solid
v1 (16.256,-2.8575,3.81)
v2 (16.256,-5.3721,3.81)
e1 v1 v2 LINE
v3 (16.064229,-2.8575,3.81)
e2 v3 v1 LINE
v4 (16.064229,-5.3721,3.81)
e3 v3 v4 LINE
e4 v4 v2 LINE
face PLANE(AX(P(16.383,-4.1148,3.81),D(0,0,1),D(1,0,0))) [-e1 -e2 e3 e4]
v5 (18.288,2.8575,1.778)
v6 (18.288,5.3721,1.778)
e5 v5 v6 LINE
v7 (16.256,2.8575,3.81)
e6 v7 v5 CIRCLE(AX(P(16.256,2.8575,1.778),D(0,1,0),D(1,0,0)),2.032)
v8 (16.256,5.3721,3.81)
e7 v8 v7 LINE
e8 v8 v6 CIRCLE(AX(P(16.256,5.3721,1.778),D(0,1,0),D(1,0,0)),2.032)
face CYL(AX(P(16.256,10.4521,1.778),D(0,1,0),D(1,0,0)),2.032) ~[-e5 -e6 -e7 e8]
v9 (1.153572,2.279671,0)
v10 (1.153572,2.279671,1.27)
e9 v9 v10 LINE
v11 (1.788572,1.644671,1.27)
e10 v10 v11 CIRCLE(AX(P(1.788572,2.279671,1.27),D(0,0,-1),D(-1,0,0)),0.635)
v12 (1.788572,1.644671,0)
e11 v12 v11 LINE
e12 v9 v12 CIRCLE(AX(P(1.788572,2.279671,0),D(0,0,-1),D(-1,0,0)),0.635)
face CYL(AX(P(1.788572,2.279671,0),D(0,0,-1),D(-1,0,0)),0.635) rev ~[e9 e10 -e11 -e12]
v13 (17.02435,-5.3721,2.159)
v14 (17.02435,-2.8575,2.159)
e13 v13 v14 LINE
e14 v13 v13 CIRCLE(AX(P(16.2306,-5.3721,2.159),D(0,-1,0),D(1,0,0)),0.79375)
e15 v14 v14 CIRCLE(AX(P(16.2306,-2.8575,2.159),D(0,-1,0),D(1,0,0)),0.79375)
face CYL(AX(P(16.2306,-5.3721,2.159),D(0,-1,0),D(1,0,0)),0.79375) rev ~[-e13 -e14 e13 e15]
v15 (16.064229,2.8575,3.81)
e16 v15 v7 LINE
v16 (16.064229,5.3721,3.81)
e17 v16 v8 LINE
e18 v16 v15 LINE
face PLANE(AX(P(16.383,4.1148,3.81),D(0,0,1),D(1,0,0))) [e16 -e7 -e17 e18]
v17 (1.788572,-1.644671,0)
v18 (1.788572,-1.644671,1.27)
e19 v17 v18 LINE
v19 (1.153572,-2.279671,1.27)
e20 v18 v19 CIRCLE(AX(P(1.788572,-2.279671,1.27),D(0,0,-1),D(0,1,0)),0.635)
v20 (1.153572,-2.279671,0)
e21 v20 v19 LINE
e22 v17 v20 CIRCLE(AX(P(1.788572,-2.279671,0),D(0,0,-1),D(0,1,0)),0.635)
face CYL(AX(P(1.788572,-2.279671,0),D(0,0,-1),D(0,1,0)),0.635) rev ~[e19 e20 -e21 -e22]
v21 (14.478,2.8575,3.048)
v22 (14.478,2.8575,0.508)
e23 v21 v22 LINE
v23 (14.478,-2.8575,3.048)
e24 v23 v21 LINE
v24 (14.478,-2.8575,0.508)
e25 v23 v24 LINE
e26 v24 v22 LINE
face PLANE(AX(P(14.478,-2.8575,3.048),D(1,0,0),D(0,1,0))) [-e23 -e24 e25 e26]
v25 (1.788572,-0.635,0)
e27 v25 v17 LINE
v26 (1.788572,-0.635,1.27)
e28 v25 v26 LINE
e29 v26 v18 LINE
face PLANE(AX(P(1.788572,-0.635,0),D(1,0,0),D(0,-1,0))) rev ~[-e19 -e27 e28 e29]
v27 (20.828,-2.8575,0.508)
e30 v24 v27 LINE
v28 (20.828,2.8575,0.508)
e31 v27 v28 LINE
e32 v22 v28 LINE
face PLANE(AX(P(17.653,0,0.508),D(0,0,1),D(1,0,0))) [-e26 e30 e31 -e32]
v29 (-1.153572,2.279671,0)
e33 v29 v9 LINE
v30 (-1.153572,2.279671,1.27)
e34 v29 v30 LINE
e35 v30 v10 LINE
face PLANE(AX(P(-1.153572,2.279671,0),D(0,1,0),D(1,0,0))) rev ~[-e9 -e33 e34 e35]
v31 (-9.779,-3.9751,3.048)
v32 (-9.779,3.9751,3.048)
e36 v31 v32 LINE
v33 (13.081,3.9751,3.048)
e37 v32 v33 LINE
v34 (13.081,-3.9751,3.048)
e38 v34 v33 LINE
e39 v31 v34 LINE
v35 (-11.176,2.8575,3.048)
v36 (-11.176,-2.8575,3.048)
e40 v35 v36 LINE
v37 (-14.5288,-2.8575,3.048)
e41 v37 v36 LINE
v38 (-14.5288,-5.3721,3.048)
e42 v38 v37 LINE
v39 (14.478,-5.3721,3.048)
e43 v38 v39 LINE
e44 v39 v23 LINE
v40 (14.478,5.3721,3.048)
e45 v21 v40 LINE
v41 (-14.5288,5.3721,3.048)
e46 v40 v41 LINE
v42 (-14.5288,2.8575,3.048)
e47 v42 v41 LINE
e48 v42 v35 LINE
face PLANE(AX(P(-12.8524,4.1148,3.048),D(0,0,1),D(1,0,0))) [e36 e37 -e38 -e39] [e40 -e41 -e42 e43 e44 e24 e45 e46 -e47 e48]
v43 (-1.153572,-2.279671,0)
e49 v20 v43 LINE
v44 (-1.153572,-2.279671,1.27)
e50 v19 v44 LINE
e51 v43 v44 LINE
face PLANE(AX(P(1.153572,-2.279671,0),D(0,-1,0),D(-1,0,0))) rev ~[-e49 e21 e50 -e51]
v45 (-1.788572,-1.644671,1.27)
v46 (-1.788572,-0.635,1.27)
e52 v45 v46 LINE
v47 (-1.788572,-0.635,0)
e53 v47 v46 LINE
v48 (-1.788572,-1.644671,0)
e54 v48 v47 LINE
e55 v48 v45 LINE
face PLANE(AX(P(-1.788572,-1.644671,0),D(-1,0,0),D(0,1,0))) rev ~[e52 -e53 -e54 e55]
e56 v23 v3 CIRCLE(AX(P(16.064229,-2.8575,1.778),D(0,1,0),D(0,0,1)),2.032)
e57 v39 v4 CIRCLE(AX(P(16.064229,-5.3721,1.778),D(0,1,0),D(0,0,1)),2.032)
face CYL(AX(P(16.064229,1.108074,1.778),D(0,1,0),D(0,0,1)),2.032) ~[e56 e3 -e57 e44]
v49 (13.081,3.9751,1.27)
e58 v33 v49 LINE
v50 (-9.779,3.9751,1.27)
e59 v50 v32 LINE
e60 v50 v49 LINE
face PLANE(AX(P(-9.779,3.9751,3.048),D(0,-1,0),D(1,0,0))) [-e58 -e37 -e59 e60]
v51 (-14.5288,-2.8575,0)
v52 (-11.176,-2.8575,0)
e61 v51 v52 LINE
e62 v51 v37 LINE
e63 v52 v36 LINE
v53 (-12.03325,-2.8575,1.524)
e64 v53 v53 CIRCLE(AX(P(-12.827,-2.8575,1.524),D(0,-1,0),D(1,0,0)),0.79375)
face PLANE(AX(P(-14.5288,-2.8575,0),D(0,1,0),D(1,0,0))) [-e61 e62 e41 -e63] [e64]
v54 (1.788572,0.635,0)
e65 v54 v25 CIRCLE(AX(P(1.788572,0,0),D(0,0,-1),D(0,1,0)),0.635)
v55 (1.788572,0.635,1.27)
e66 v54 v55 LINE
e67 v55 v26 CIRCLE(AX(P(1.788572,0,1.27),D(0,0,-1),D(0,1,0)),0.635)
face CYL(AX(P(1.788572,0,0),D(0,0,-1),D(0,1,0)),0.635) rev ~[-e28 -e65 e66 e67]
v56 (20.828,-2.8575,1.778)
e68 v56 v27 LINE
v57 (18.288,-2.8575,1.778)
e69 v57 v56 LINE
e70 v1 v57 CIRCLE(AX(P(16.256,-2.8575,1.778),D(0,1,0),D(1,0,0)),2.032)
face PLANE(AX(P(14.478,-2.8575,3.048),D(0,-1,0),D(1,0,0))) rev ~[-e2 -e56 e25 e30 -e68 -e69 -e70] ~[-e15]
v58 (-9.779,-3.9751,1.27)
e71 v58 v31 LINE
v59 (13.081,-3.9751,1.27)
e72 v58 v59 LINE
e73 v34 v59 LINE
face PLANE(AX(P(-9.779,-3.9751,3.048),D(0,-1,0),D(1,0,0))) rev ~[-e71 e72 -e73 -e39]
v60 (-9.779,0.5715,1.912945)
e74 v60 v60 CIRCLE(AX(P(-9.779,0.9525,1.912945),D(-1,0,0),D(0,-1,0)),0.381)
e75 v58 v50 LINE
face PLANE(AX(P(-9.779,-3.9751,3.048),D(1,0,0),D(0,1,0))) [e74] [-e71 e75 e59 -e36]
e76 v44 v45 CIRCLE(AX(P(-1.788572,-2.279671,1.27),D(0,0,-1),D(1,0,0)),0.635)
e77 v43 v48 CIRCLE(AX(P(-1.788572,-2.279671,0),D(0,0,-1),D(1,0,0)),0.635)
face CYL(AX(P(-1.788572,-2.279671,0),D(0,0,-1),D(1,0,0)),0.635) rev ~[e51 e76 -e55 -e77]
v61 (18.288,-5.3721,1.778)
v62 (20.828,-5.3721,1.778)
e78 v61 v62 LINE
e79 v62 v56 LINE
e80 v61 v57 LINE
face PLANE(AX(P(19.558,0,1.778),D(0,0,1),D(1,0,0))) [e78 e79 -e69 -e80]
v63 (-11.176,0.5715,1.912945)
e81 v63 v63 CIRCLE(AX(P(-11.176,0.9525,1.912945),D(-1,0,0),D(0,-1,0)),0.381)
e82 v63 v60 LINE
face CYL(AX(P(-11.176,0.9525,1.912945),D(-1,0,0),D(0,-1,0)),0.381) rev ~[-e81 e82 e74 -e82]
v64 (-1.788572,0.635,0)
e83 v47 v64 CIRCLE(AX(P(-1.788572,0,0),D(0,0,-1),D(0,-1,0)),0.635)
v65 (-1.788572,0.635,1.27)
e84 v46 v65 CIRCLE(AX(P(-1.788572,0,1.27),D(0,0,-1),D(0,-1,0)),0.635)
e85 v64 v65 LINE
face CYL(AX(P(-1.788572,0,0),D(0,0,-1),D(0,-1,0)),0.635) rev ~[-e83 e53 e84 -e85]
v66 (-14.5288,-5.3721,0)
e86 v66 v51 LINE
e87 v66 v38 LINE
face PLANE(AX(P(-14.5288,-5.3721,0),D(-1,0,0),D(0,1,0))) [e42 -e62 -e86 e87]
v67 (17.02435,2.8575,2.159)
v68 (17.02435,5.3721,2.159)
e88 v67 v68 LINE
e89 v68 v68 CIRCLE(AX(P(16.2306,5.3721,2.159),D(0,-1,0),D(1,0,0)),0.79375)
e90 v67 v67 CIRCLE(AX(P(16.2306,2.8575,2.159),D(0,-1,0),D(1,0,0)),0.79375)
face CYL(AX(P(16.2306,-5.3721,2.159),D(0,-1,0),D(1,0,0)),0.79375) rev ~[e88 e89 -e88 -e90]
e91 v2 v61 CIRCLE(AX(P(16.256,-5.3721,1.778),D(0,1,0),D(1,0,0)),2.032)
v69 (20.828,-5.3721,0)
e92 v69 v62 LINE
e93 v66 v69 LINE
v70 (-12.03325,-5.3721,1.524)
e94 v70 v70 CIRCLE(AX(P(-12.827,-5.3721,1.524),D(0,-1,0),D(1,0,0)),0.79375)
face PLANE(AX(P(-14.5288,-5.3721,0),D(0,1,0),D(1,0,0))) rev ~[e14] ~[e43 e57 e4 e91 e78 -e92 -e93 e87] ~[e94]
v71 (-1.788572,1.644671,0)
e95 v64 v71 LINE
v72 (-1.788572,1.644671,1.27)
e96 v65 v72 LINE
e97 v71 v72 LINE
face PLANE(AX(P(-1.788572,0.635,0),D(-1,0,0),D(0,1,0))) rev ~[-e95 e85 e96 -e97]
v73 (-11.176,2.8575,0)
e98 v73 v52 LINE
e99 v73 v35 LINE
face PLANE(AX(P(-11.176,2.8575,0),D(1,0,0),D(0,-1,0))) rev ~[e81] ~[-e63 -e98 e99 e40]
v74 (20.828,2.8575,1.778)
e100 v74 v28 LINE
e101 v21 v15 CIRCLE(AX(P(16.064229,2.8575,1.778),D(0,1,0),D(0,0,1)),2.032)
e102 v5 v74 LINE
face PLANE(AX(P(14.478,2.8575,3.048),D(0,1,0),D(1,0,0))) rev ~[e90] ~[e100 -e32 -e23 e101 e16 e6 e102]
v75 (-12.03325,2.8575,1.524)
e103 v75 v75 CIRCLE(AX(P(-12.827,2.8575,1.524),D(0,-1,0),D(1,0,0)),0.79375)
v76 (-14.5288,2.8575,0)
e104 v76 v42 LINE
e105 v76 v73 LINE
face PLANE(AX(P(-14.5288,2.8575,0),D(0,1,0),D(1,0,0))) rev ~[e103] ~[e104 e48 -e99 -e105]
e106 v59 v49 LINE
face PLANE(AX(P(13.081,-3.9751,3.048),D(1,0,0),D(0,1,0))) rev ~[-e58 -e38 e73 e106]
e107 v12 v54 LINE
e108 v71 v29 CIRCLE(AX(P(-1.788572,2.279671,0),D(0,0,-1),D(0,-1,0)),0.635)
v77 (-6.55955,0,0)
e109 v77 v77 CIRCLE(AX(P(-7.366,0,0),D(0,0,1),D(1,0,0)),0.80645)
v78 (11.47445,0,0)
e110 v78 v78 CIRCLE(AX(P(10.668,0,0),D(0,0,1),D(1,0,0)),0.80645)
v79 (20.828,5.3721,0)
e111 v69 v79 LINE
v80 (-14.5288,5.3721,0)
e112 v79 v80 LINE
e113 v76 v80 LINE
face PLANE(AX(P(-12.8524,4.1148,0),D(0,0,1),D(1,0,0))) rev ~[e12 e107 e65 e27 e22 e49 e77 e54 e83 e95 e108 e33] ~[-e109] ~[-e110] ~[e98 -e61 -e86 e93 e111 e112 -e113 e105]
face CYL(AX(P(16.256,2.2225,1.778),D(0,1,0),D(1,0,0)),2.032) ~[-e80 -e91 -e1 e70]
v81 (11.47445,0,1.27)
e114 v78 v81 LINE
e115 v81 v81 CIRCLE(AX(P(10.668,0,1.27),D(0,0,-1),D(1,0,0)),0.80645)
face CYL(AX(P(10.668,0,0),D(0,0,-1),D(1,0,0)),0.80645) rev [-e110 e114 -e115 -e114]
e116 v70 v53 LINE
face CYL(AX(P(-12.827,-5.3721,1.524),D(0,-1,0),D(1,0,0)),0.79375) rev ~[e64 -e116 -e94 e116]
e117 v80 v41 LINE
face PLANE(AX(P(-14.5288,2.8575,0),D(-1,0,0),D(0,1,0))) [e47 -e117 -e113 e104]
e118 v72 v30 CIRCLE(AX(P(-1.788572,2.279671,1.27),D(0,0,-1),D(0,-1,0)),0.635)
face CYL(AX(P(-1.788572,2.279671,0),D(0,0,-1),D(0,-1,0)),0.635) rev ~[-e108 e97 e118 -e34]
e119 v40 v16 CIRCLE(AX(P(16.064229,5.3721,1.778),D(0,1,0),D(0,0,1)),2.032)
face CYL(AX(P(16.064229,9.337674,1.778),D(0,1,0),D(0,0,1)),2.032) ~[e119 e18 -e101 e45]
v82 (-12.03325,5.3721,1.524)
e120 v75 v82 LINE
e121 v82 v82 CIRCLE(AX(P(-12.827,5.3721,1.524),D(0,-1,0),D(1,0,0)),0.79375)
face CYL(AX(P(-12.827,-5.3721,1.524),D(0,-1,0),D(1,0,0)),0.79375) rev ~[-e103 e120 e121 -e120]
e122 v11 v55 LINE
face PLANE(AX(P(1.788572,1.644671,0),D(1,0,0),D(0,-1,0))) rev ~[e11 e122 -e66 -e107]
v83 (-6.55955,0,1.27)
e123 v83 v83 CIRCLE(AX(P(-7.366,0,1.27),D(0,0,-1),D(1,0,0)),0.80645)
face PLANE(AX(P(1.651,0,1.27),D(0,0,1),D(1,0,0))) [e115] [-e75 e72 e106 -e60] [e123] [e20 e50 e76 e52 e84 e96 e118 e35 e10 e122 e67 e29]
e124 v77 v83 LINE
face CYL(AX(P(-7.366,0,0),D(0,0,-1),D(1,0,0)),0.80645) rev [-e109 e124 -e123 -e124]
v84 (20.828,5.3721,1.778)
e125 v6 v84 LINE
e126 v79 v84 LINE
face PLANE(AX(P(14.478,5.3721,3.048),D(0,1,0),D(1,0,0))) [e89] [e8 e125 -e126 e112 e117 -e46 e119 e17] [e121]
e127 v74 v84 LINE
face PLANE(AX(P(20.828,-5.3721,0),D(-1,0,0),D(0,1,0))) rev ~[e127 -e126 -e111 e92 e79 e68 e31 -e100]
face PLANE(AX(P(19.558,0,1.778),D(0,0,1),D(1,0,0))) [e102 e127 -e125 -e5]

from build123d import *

# Parameters (mm, degrees)
F0_W         = 3.3528
F0_H         = 2.5146
F0_R         = 0.80645
F0_W_2       = 6.35
F0_H_2       = 10.7442
F1_DEPTH     = 3.048
F2_W         = 2.54
F2_H         = 10.7442
F2_W_2       = 22.86
F2_H_2       = 7.9502
F3_DEPTH     = 1.27
F4_W         = 6.35
F4_H         = 5.715
F5_DEPTH     = 2.54
F6_R         = 0.79375
F7_DEPTH     = 10.7452
F8_DEPTH     = 0.508
F9_W         = 3.81
F9_H         = 2.5146
F10_DEPTH    = 0.762
F11_T1_DEPTH = 10.445747458
F11_T3_DEPTH = 10.445747458
F11_T5_DEPTH = 12.6746
F11_T7_DEPTH = 12.6746
F12_R        = 0.381
F13_DEPTH    = 1.397


# Not quite as in the source:
# - a fillet or chamfer that OpenCascade refuses, or shapes differently, is made with other operations: its cross-section is extruded or revolved along the edge and cut away or added
# - a feature names something its author has since deleted; it is built from what else it names


with BuildPart() as f1:
    # F0 (on Top) → F1 (new body)
    with BuildSketch(Plane.XY):
        with Locations((-12.8524, 4.1148)):
            Rectangle(F0_W, F0_H)
        with Locations((-12.8524, -4.1148)):
            Rectangle(F0_W, F0_H)
        Polygon((14.478, -5.3721), (14.478, 5.3721), (-11.176, 5.3721), (-11.176, 2.8575), (-11.176, -2.8575), (-11.176, -5.3721), align=None)
        with Locations((-7.366, 0)):
            Circle(F0_R, mode=Mode.SUBTRACT)
        with BuildLine():
            ThreePointArc((-1.7885716042, 1.644670926), (-2.2375844102, 2.728683732), (-1.1535716042, 2.279670926))
            Line((-1.1535716042, 2.279670926), (1.1535716042, 2.279670926))
            ThreePointArc((1.1535716042, 2.279670926), (2.2375844102, 2.728683732), (1.7885716042, 1.644670926))
            Line((1.7885716042, 1.644670926), (1.7885716042, 0.635))
            ThreePointArc((1.7885716042, 0.635), (2.4235716042, 0), (1.7885716042, -0.635))
            Line((1.7885716042, -0.635), (1.7885716042, -1.644670926))
            ThreePointArc((1.7885716042, -1.644670926), (2.2375844102, -2.728683732), (1.1535716042, -2.279670926))
            Line((1.1535716042, -2.279670926), (-1.1535716042, -2.279670926))
            ThreePointArc((-1.1535716042, -2.279670926), (-2.2375844102, -2.728683732), (-1.7885716042, -1.644670926))
            Line((-1.7885716042, -1.644670926), (-1.7885716042, -0.635))
            ThreePointArc((-1.7885716042, -0.635), (-2.4235716042, 0), (-1.7885716042, 0.635))
            Line((-1.7885716042, 0.635), (-1.7885716042, 1.644670926))
        make_face(mode=Mode.SUBTRACT)
        with Locations((10.668, 0)):
            Circle(F0_R, mode=Mode.SUBTRACT)
        with Locations((17.653, 0)):
            Rectangle(F0_W_2, F0_H_2)
    extrude(amount=F1_DEPTH)

    # F2 (on face) → F3 (cut)
    with BuildSketch(Plane.XY.offset(3.048)):
        with Locations((19.558, 0)):
            Rectangle(F2_W, F2_H)
        with Locations((1.651, 0)):
            Rectangle(F2_W_2, F2_H_2)
    extrude(amount=-F3_DEPTH, mode=Mode.SUBTRACT)

    # F4 (on face) → F5 (cut)
    with BuildSketch(Plane.XY.offset(3.048)):
        with Locations((17.653, 0)):
            Rectangle(F4_W, F4_H)
    extrude(amount=-F5_DEPTH, mode=Mode.SUBTRACT)

    # F6 (on face) → F7 (cut, through all)
    with BuildSketch(Plane.XZ.offset(5.3721)):
        with Locations((-12.827, 1.524)):
            Circle(F6_R)
        with Locations((16.2306, 2.159)):
            Circle(F6_R)
    extrude(amount=-F7_DEPTH, mode=Mode.SUBTRACT)

    # F8 (cut): a face of the model
    f8_faces = [f1.faces().sort_by_distance(p)[0] for p in [
        (-9.5369699853, 0, 1.778),
    ]]
    extrude(f8_faces, amount=-F8_DEPTH, mode=Mode.SUBTRACT)

    # F9 (on face) → F10 (join)
    with BuildSketch(Plane.XY.offset(3.048)):
        with Locations((16.383, 4.1148)):
            Rectangle(F9_W, F9_H)
        with Locations((16.383, -4.1148)):
            Rectangle(F9_W, F9_H)
    extrude(amount=F10_DEPTH)

    # F11: fillet of radius 2.032 on 4 edges, made by hand

    # F11_s2 → F11_t1 (cut)
    with BuildSketch(Plane.XZ.offset(-1.108073729)):
        with BuildLine():
            ThreePointArc((16.0642294916, 3.81), (15.1843476813, 3.6096200479), (14.478, 3.048))
            Line((14.478, 3.048), (14.478, 3.81))
            Line((14.478, 3.81), (16.0642294916, 3.81))
        make_face()
    extrude(amount=F11_T1_DEPTH, mode=Mode.SUBTRACT)

    # F11_s4 → F11_t3 (cut)
    with BuildSketch(Plane.XZ.offset(-9.337673729)):
        with BuildLine():
            ThreePointArc((16.0642294916, 3.81), (15.1843476813, 3.6096200479), (14.478, 3.048))
            Line((14.478, 3.048), (14.478, 3.81))
            Line((14.478, 3.81), (16.0642294916, 3.81))
        make_face()
    extrude(amount=F11_T3_DEPTH, mode=Mode.SUBTRACT)

    # F11_s6 → F11_t5 (cut)
    with BuildSketch(Plane.XZ.offset(-10.4521)):
        with BuildLine():
            ThreePointArc((18.288, 1.778), (17.6928409794, 3.2148409794), (16.256, 3.81))
            Line((16.256, 3.81), (18.288, 3.81))
            Line((18.288, 3.81), (18.288, 1.778))
        make_face()
    extrude(amount=F11_T5_DEPTH, mode=Mode.SUBTRACT)

    # F11_s8 → F11_t7 (cut)
    with BuildSketch(Plane.XZ.offset(-2.2225)):
        with BuildLine():
            ThreePointArc((18.288, 1.778), (17.6928409794, 3.2148409794), (16.256, 3.81))
            Line((16.256, 3.81), (18.288, 3.81))
            Line((18.288, 3.81), (18.288, 1.778))
        make_face()
    extrude(amount=F11_T7_DEPTH, mode=Mode.SUBTRACT)

    # F12 (on face) → F13 (cut, through all)
    with BuildSketch(Plane(origin=(-11.176, 0, 0), x_dir=(0, -1, 0), z_dir=(-1, 0, 0))):
        with Locations((-0.9525, 1.9129452994)):
            Circle(F12_R)
    extrude(amount=-F13_DEPTH, mode=Mode.SUBTRACT)


solid = f1.part
